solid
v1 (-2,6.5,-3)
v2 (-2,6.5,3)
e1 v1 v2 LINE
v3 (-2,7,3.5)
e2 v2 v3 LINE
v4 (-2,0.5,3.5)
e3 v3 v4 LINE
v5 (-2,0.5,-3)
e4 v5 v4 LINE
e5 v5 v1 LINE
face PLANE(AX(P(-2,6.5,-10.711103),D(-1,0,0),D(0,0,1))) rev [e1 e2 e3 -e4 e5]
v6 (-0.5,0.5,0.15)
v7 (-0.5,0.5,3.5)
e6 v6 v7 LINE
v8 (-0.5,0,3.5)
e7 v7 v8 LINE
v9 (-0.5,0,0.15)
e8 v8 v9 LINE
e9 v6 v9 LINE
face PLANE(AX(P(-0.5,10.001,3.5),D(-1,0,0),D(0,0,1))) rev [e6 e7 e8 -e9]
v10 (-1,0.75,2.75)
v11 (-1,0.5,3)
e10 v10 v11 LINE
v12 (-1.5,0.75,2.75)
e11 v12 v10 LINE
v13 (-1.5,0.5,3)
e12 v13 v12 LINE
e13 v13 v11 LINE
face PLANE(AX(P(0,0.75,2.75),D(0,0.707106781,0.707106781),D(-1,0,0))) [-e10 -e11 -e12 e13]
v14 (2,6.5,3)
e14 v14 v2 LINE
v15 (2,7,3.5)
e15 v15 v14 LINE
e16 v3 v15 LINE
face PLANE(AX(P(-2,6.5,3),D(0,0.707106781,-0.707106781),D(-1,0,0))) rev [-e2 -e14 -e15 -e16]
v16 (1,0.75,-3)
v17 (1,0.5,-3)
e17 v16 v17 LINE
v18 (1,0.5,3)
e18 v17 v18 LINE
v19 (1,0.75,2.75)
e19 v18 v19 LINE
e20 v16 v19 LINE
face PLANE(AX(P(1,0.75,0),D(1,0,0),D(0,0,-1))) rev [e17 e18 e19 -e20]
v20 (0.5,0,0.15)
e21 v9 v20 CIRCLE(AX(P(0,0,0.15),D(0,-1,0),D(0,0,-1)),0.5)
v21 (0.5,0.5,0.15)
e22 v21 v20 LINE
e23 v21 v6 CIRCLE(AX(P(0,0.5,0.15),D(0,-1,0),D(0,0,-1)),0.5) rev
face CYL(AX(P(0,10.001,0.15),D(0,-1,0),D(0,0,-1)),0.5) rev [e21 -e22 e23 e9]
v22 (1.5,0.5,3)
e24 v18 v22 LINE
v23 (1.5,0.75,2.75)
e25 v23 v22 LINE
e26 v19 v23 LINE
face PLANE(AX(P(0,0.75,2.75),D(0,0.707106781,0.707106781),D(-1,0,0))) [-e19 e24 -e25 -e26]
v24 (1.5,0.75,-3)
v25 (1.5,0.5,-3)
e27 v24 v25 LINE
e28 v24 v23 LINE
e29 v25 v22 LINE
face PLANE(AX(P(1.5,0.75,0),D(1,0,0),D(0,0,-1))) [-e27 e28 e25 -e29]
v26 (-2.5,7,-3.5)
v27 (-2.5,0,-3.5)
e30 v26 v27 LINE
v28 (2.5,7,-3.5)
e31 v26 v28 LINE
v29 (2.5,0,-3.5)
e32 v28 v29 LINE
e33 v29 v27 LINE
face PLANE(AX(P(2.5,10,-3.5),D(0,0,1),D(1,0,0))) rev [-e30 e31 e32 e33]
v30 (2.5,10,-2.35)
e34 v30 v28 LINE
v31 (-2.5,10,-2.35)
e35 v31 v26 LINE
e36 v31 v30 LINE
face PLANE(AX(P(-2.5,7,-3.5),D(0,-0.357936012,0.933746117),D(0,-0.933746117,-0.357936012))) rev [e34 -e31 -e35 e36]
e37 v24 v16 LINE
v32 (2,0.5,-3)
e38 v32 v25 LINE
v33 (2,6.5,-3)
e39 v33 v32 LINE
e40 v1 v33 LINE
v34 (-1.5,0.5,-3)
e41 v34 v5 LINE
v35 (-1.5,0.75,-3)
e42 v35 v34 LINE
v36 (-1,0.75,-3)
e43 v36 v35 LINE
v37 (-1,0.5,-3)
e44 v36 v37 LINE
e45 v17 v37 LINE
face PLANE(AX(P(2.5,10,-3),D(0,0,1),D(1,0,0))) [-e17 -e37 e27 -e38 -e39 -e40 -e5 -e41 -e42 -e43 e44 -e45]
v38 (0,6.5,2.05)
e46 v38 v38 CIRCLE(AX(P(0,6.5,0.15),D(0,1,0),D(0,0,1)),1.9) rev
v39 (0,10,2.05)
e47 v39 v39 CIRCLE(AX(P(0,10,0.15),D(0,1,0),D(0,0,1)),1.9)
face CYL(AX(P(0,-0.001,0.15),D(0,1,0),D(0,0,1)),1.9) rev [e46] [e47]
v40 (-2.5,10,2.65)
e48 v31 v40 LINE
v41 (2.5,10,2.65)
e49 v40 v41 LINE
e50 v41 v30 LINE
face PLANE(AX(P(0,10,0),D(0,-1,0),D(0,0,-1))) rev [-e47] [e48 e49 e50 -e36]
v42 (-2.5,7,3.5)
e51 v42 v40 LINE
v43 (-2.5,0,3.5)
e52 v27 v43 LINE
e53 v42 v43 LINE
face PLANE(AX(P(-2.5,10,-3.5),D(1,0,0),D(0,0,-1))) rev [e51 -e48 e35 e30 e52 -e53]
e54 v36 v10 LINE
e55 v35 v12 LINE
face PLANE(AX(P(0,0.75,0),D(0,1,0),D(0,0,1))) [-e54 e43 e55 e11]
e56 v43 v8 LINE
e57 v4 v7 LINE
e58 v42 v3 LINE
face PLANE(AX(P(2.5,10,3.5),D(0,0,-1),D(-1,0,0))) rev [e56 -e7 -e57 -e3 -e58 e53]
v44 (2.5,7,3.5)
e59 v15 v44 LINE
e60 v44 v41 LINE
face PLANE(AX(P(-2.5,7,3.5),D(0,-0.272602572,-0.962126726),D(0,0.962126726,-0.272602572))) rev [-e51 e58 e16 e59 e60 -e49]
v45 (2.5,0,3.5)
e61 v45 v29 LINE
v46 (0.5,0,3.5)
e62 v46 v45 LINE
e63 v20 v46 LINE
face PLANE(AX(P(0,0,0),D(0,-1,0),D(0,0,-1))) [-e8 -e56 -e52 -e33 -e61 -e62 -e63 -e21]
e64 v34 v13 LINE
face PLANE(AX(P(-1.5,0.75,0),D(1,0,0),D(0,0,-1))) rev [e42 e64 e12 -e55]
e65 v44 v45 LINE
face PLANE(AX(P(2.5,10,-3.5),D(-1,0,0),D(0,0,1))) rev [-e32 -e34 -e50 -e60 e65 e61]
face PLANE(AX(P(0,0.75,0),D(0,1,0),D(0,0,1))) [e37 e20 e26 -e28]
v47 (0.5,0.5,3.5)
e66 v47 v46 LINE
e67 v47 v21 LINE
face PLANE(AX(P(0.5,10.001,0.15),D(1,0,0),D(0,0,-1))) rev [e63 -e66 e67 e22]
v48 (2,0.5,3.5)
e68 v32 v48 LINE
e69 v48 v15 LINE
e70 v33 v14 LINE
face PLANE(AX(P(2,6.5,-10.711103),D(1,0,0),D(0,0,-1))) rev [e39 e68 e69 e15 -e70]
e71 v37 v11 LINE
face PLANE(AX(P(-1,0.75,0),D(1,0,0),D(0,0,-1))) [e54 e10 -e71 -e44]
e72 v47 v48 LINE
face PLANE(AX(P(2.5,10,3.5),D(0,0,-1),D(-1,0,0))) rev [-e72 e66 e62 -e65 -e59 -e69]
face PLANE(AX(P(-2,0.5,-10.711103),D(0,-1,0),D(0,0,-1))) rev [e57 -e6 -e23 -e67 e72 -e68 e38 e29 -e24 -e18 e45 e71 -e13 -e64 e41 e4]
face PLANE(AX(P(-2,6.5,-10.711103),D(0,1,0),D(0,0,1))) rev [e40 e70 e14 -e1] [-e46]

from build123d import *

# Parameters (mm, degrees)
SKETCH1_W           = 5
SKETCH1_H           = 7
BOSS_EXTRUDE1_DEPTH = 10
CUT_EXTRUDE1_DEPTH  = 12.715374514
SKETCH3_W           = 4
SKETCH3_H           = 6
CUT_EXTRUDE2_DEPTH  = 6.5
CUT_EXTRUDE3_REACH  = 12.886
SKETCH4_R           = 1.9
CUT_EXTRUDE4_REACH  = 12.886
SKETCH6_W           = 0.5
SKETCH6_H           = 6
BOSS_EXTRUDE3_DEPTH = 0.25
CHAMFER1_SIZE       = 0.25
CHAMFER2_SIZE       = 0.5


with BuildPart() as part:
    # Sketch1 → Boss-Extrude1 (new body)
    with BuildSketch(Plane(origin=(0, 0, 0), x_dir=(1, 0, 0), z_dir=(0, 1, 0))):
        Rectangle(SKETCH1_W, SKETCH1_H)
    extrude(amount=BOSS_EXTRUDE1_DEPTH)

    # Sketch2 → Cut-Extrude1 (cut, through all)
    with BuildSketch(Plane(origin=(2.5, 0, 0), x_dir=(0, 0, -1), z_dir=(1, 0, 0))):
        Polygon((-3.5, 7), (-2.65, 10), (-3.5, 10), align=None)
        Polygon((2.35, 10), (3.5, 10), (3.5, 7), align=None)
    extrude(amount=-CUT_EXTRUDE1_DEPTH, mode=Mode.SUBTRACT)

    # Sketch3 → Cut-Extrude2 (cut)
    with BuildSketch(Plane.XY.offset(3.5)):
        with Locations((0, 3.5)):
            Rectangle(SKETCH3_W, SKETCH3_H)
    extrude(amount=-CUT_EXTRUDE2_DEPTH, mode=Mode.SUBTRACT)

    # Sketch4 → Cut-Extrude3 (cut, up to next)
    with BuildSketch(Plane(origin=(0, 10, 0), x_dir=(1, 0, 0), z_dir=(0, 1, 0)), mode=Mode.PRIVATE) as cut_extrude3_sk1:
        with Locations(Location((0, -0.15, 0), (0, 0, 270))):
            Circle(SKETCH4_R)
    cut_extrude3_tool1 = extrude(cut_extrude3_sk1.sketch, amount=-CUT_EXTRUDE3_REACH, mode=Mode.PRIVATE) & part.part
    add(cut_extrude3_tool1.solids().sort_by_distance((0, 10, 0.15))[0], mode=Mode.SUBTRACT)

    # Sketch5 → Cut-Extrude4 (cut, up to next)
    with BuildSketch(Plane.XZ, mode=Mode.PRIVATE) as cut_extrude4_sk1:
        with BuildLine():
            Line((-0.5, 3.5), (-0.5, 0.15))
            ThreePointArc((-0.5, 0.15), (0, -0.35), (0.5, 0.15))
            Line((0.5, 0.15), (0.5, 3.5))
            Line((0.5, 3.5), (-0.5, 3.5))
        make_face()
    cut_extrude4_tool1 = extrude(cut_extrude4_sk1.sketch, amount=-CUT_EXTRUDE4_REACH, mode=Mode.PRIVATE) & part.part
    add(cut_extrude4_tool1.solids().sort_by_distance((0, 0, 1.626987))[0], mode=Mode.SUBTRACT)

    # Sketch6 → Boss-Extrude3 (add)
    with BuildSketch(Plane(origin=(0, 0.5, 0), x_dir=(1, 0, 0), z_dir=(0, 1, 0))):
        with Locations((-1.25, 0)):
            Rectangle(SKETCH6_W, SKETCH6_H)
        Polygon((1.5, 3), (1, 3), (1, -3), (1.5, -3), (1.5, 0), align=None)
    extrude(amount=BOSS_EXTRUDE3_DEPTH)

    # Chamfer1
    chamfer1_edges = [part.edges().sort_by_distance(p)[0] for p in [
        (1.25, 0.75, 3),
        (-1.25, 0.75, 3),
    ]]
    chamfer(chamfer1_edges, length=CHAMFER1_SIZE - 0.0001)  # a hair under: the kernel refuses the full size

    # Chamfer2
    chamfer2_edges = [part.edges().sort_by_distance(p)[0] for p in [
        (0, 6.5, 3.5),
    ]]
    chamfer(chamfer2_edges, length=CHAMFER2_SIZE - 0.0001)  # a hair under: the kernel refuses the full size


solid = part.part
